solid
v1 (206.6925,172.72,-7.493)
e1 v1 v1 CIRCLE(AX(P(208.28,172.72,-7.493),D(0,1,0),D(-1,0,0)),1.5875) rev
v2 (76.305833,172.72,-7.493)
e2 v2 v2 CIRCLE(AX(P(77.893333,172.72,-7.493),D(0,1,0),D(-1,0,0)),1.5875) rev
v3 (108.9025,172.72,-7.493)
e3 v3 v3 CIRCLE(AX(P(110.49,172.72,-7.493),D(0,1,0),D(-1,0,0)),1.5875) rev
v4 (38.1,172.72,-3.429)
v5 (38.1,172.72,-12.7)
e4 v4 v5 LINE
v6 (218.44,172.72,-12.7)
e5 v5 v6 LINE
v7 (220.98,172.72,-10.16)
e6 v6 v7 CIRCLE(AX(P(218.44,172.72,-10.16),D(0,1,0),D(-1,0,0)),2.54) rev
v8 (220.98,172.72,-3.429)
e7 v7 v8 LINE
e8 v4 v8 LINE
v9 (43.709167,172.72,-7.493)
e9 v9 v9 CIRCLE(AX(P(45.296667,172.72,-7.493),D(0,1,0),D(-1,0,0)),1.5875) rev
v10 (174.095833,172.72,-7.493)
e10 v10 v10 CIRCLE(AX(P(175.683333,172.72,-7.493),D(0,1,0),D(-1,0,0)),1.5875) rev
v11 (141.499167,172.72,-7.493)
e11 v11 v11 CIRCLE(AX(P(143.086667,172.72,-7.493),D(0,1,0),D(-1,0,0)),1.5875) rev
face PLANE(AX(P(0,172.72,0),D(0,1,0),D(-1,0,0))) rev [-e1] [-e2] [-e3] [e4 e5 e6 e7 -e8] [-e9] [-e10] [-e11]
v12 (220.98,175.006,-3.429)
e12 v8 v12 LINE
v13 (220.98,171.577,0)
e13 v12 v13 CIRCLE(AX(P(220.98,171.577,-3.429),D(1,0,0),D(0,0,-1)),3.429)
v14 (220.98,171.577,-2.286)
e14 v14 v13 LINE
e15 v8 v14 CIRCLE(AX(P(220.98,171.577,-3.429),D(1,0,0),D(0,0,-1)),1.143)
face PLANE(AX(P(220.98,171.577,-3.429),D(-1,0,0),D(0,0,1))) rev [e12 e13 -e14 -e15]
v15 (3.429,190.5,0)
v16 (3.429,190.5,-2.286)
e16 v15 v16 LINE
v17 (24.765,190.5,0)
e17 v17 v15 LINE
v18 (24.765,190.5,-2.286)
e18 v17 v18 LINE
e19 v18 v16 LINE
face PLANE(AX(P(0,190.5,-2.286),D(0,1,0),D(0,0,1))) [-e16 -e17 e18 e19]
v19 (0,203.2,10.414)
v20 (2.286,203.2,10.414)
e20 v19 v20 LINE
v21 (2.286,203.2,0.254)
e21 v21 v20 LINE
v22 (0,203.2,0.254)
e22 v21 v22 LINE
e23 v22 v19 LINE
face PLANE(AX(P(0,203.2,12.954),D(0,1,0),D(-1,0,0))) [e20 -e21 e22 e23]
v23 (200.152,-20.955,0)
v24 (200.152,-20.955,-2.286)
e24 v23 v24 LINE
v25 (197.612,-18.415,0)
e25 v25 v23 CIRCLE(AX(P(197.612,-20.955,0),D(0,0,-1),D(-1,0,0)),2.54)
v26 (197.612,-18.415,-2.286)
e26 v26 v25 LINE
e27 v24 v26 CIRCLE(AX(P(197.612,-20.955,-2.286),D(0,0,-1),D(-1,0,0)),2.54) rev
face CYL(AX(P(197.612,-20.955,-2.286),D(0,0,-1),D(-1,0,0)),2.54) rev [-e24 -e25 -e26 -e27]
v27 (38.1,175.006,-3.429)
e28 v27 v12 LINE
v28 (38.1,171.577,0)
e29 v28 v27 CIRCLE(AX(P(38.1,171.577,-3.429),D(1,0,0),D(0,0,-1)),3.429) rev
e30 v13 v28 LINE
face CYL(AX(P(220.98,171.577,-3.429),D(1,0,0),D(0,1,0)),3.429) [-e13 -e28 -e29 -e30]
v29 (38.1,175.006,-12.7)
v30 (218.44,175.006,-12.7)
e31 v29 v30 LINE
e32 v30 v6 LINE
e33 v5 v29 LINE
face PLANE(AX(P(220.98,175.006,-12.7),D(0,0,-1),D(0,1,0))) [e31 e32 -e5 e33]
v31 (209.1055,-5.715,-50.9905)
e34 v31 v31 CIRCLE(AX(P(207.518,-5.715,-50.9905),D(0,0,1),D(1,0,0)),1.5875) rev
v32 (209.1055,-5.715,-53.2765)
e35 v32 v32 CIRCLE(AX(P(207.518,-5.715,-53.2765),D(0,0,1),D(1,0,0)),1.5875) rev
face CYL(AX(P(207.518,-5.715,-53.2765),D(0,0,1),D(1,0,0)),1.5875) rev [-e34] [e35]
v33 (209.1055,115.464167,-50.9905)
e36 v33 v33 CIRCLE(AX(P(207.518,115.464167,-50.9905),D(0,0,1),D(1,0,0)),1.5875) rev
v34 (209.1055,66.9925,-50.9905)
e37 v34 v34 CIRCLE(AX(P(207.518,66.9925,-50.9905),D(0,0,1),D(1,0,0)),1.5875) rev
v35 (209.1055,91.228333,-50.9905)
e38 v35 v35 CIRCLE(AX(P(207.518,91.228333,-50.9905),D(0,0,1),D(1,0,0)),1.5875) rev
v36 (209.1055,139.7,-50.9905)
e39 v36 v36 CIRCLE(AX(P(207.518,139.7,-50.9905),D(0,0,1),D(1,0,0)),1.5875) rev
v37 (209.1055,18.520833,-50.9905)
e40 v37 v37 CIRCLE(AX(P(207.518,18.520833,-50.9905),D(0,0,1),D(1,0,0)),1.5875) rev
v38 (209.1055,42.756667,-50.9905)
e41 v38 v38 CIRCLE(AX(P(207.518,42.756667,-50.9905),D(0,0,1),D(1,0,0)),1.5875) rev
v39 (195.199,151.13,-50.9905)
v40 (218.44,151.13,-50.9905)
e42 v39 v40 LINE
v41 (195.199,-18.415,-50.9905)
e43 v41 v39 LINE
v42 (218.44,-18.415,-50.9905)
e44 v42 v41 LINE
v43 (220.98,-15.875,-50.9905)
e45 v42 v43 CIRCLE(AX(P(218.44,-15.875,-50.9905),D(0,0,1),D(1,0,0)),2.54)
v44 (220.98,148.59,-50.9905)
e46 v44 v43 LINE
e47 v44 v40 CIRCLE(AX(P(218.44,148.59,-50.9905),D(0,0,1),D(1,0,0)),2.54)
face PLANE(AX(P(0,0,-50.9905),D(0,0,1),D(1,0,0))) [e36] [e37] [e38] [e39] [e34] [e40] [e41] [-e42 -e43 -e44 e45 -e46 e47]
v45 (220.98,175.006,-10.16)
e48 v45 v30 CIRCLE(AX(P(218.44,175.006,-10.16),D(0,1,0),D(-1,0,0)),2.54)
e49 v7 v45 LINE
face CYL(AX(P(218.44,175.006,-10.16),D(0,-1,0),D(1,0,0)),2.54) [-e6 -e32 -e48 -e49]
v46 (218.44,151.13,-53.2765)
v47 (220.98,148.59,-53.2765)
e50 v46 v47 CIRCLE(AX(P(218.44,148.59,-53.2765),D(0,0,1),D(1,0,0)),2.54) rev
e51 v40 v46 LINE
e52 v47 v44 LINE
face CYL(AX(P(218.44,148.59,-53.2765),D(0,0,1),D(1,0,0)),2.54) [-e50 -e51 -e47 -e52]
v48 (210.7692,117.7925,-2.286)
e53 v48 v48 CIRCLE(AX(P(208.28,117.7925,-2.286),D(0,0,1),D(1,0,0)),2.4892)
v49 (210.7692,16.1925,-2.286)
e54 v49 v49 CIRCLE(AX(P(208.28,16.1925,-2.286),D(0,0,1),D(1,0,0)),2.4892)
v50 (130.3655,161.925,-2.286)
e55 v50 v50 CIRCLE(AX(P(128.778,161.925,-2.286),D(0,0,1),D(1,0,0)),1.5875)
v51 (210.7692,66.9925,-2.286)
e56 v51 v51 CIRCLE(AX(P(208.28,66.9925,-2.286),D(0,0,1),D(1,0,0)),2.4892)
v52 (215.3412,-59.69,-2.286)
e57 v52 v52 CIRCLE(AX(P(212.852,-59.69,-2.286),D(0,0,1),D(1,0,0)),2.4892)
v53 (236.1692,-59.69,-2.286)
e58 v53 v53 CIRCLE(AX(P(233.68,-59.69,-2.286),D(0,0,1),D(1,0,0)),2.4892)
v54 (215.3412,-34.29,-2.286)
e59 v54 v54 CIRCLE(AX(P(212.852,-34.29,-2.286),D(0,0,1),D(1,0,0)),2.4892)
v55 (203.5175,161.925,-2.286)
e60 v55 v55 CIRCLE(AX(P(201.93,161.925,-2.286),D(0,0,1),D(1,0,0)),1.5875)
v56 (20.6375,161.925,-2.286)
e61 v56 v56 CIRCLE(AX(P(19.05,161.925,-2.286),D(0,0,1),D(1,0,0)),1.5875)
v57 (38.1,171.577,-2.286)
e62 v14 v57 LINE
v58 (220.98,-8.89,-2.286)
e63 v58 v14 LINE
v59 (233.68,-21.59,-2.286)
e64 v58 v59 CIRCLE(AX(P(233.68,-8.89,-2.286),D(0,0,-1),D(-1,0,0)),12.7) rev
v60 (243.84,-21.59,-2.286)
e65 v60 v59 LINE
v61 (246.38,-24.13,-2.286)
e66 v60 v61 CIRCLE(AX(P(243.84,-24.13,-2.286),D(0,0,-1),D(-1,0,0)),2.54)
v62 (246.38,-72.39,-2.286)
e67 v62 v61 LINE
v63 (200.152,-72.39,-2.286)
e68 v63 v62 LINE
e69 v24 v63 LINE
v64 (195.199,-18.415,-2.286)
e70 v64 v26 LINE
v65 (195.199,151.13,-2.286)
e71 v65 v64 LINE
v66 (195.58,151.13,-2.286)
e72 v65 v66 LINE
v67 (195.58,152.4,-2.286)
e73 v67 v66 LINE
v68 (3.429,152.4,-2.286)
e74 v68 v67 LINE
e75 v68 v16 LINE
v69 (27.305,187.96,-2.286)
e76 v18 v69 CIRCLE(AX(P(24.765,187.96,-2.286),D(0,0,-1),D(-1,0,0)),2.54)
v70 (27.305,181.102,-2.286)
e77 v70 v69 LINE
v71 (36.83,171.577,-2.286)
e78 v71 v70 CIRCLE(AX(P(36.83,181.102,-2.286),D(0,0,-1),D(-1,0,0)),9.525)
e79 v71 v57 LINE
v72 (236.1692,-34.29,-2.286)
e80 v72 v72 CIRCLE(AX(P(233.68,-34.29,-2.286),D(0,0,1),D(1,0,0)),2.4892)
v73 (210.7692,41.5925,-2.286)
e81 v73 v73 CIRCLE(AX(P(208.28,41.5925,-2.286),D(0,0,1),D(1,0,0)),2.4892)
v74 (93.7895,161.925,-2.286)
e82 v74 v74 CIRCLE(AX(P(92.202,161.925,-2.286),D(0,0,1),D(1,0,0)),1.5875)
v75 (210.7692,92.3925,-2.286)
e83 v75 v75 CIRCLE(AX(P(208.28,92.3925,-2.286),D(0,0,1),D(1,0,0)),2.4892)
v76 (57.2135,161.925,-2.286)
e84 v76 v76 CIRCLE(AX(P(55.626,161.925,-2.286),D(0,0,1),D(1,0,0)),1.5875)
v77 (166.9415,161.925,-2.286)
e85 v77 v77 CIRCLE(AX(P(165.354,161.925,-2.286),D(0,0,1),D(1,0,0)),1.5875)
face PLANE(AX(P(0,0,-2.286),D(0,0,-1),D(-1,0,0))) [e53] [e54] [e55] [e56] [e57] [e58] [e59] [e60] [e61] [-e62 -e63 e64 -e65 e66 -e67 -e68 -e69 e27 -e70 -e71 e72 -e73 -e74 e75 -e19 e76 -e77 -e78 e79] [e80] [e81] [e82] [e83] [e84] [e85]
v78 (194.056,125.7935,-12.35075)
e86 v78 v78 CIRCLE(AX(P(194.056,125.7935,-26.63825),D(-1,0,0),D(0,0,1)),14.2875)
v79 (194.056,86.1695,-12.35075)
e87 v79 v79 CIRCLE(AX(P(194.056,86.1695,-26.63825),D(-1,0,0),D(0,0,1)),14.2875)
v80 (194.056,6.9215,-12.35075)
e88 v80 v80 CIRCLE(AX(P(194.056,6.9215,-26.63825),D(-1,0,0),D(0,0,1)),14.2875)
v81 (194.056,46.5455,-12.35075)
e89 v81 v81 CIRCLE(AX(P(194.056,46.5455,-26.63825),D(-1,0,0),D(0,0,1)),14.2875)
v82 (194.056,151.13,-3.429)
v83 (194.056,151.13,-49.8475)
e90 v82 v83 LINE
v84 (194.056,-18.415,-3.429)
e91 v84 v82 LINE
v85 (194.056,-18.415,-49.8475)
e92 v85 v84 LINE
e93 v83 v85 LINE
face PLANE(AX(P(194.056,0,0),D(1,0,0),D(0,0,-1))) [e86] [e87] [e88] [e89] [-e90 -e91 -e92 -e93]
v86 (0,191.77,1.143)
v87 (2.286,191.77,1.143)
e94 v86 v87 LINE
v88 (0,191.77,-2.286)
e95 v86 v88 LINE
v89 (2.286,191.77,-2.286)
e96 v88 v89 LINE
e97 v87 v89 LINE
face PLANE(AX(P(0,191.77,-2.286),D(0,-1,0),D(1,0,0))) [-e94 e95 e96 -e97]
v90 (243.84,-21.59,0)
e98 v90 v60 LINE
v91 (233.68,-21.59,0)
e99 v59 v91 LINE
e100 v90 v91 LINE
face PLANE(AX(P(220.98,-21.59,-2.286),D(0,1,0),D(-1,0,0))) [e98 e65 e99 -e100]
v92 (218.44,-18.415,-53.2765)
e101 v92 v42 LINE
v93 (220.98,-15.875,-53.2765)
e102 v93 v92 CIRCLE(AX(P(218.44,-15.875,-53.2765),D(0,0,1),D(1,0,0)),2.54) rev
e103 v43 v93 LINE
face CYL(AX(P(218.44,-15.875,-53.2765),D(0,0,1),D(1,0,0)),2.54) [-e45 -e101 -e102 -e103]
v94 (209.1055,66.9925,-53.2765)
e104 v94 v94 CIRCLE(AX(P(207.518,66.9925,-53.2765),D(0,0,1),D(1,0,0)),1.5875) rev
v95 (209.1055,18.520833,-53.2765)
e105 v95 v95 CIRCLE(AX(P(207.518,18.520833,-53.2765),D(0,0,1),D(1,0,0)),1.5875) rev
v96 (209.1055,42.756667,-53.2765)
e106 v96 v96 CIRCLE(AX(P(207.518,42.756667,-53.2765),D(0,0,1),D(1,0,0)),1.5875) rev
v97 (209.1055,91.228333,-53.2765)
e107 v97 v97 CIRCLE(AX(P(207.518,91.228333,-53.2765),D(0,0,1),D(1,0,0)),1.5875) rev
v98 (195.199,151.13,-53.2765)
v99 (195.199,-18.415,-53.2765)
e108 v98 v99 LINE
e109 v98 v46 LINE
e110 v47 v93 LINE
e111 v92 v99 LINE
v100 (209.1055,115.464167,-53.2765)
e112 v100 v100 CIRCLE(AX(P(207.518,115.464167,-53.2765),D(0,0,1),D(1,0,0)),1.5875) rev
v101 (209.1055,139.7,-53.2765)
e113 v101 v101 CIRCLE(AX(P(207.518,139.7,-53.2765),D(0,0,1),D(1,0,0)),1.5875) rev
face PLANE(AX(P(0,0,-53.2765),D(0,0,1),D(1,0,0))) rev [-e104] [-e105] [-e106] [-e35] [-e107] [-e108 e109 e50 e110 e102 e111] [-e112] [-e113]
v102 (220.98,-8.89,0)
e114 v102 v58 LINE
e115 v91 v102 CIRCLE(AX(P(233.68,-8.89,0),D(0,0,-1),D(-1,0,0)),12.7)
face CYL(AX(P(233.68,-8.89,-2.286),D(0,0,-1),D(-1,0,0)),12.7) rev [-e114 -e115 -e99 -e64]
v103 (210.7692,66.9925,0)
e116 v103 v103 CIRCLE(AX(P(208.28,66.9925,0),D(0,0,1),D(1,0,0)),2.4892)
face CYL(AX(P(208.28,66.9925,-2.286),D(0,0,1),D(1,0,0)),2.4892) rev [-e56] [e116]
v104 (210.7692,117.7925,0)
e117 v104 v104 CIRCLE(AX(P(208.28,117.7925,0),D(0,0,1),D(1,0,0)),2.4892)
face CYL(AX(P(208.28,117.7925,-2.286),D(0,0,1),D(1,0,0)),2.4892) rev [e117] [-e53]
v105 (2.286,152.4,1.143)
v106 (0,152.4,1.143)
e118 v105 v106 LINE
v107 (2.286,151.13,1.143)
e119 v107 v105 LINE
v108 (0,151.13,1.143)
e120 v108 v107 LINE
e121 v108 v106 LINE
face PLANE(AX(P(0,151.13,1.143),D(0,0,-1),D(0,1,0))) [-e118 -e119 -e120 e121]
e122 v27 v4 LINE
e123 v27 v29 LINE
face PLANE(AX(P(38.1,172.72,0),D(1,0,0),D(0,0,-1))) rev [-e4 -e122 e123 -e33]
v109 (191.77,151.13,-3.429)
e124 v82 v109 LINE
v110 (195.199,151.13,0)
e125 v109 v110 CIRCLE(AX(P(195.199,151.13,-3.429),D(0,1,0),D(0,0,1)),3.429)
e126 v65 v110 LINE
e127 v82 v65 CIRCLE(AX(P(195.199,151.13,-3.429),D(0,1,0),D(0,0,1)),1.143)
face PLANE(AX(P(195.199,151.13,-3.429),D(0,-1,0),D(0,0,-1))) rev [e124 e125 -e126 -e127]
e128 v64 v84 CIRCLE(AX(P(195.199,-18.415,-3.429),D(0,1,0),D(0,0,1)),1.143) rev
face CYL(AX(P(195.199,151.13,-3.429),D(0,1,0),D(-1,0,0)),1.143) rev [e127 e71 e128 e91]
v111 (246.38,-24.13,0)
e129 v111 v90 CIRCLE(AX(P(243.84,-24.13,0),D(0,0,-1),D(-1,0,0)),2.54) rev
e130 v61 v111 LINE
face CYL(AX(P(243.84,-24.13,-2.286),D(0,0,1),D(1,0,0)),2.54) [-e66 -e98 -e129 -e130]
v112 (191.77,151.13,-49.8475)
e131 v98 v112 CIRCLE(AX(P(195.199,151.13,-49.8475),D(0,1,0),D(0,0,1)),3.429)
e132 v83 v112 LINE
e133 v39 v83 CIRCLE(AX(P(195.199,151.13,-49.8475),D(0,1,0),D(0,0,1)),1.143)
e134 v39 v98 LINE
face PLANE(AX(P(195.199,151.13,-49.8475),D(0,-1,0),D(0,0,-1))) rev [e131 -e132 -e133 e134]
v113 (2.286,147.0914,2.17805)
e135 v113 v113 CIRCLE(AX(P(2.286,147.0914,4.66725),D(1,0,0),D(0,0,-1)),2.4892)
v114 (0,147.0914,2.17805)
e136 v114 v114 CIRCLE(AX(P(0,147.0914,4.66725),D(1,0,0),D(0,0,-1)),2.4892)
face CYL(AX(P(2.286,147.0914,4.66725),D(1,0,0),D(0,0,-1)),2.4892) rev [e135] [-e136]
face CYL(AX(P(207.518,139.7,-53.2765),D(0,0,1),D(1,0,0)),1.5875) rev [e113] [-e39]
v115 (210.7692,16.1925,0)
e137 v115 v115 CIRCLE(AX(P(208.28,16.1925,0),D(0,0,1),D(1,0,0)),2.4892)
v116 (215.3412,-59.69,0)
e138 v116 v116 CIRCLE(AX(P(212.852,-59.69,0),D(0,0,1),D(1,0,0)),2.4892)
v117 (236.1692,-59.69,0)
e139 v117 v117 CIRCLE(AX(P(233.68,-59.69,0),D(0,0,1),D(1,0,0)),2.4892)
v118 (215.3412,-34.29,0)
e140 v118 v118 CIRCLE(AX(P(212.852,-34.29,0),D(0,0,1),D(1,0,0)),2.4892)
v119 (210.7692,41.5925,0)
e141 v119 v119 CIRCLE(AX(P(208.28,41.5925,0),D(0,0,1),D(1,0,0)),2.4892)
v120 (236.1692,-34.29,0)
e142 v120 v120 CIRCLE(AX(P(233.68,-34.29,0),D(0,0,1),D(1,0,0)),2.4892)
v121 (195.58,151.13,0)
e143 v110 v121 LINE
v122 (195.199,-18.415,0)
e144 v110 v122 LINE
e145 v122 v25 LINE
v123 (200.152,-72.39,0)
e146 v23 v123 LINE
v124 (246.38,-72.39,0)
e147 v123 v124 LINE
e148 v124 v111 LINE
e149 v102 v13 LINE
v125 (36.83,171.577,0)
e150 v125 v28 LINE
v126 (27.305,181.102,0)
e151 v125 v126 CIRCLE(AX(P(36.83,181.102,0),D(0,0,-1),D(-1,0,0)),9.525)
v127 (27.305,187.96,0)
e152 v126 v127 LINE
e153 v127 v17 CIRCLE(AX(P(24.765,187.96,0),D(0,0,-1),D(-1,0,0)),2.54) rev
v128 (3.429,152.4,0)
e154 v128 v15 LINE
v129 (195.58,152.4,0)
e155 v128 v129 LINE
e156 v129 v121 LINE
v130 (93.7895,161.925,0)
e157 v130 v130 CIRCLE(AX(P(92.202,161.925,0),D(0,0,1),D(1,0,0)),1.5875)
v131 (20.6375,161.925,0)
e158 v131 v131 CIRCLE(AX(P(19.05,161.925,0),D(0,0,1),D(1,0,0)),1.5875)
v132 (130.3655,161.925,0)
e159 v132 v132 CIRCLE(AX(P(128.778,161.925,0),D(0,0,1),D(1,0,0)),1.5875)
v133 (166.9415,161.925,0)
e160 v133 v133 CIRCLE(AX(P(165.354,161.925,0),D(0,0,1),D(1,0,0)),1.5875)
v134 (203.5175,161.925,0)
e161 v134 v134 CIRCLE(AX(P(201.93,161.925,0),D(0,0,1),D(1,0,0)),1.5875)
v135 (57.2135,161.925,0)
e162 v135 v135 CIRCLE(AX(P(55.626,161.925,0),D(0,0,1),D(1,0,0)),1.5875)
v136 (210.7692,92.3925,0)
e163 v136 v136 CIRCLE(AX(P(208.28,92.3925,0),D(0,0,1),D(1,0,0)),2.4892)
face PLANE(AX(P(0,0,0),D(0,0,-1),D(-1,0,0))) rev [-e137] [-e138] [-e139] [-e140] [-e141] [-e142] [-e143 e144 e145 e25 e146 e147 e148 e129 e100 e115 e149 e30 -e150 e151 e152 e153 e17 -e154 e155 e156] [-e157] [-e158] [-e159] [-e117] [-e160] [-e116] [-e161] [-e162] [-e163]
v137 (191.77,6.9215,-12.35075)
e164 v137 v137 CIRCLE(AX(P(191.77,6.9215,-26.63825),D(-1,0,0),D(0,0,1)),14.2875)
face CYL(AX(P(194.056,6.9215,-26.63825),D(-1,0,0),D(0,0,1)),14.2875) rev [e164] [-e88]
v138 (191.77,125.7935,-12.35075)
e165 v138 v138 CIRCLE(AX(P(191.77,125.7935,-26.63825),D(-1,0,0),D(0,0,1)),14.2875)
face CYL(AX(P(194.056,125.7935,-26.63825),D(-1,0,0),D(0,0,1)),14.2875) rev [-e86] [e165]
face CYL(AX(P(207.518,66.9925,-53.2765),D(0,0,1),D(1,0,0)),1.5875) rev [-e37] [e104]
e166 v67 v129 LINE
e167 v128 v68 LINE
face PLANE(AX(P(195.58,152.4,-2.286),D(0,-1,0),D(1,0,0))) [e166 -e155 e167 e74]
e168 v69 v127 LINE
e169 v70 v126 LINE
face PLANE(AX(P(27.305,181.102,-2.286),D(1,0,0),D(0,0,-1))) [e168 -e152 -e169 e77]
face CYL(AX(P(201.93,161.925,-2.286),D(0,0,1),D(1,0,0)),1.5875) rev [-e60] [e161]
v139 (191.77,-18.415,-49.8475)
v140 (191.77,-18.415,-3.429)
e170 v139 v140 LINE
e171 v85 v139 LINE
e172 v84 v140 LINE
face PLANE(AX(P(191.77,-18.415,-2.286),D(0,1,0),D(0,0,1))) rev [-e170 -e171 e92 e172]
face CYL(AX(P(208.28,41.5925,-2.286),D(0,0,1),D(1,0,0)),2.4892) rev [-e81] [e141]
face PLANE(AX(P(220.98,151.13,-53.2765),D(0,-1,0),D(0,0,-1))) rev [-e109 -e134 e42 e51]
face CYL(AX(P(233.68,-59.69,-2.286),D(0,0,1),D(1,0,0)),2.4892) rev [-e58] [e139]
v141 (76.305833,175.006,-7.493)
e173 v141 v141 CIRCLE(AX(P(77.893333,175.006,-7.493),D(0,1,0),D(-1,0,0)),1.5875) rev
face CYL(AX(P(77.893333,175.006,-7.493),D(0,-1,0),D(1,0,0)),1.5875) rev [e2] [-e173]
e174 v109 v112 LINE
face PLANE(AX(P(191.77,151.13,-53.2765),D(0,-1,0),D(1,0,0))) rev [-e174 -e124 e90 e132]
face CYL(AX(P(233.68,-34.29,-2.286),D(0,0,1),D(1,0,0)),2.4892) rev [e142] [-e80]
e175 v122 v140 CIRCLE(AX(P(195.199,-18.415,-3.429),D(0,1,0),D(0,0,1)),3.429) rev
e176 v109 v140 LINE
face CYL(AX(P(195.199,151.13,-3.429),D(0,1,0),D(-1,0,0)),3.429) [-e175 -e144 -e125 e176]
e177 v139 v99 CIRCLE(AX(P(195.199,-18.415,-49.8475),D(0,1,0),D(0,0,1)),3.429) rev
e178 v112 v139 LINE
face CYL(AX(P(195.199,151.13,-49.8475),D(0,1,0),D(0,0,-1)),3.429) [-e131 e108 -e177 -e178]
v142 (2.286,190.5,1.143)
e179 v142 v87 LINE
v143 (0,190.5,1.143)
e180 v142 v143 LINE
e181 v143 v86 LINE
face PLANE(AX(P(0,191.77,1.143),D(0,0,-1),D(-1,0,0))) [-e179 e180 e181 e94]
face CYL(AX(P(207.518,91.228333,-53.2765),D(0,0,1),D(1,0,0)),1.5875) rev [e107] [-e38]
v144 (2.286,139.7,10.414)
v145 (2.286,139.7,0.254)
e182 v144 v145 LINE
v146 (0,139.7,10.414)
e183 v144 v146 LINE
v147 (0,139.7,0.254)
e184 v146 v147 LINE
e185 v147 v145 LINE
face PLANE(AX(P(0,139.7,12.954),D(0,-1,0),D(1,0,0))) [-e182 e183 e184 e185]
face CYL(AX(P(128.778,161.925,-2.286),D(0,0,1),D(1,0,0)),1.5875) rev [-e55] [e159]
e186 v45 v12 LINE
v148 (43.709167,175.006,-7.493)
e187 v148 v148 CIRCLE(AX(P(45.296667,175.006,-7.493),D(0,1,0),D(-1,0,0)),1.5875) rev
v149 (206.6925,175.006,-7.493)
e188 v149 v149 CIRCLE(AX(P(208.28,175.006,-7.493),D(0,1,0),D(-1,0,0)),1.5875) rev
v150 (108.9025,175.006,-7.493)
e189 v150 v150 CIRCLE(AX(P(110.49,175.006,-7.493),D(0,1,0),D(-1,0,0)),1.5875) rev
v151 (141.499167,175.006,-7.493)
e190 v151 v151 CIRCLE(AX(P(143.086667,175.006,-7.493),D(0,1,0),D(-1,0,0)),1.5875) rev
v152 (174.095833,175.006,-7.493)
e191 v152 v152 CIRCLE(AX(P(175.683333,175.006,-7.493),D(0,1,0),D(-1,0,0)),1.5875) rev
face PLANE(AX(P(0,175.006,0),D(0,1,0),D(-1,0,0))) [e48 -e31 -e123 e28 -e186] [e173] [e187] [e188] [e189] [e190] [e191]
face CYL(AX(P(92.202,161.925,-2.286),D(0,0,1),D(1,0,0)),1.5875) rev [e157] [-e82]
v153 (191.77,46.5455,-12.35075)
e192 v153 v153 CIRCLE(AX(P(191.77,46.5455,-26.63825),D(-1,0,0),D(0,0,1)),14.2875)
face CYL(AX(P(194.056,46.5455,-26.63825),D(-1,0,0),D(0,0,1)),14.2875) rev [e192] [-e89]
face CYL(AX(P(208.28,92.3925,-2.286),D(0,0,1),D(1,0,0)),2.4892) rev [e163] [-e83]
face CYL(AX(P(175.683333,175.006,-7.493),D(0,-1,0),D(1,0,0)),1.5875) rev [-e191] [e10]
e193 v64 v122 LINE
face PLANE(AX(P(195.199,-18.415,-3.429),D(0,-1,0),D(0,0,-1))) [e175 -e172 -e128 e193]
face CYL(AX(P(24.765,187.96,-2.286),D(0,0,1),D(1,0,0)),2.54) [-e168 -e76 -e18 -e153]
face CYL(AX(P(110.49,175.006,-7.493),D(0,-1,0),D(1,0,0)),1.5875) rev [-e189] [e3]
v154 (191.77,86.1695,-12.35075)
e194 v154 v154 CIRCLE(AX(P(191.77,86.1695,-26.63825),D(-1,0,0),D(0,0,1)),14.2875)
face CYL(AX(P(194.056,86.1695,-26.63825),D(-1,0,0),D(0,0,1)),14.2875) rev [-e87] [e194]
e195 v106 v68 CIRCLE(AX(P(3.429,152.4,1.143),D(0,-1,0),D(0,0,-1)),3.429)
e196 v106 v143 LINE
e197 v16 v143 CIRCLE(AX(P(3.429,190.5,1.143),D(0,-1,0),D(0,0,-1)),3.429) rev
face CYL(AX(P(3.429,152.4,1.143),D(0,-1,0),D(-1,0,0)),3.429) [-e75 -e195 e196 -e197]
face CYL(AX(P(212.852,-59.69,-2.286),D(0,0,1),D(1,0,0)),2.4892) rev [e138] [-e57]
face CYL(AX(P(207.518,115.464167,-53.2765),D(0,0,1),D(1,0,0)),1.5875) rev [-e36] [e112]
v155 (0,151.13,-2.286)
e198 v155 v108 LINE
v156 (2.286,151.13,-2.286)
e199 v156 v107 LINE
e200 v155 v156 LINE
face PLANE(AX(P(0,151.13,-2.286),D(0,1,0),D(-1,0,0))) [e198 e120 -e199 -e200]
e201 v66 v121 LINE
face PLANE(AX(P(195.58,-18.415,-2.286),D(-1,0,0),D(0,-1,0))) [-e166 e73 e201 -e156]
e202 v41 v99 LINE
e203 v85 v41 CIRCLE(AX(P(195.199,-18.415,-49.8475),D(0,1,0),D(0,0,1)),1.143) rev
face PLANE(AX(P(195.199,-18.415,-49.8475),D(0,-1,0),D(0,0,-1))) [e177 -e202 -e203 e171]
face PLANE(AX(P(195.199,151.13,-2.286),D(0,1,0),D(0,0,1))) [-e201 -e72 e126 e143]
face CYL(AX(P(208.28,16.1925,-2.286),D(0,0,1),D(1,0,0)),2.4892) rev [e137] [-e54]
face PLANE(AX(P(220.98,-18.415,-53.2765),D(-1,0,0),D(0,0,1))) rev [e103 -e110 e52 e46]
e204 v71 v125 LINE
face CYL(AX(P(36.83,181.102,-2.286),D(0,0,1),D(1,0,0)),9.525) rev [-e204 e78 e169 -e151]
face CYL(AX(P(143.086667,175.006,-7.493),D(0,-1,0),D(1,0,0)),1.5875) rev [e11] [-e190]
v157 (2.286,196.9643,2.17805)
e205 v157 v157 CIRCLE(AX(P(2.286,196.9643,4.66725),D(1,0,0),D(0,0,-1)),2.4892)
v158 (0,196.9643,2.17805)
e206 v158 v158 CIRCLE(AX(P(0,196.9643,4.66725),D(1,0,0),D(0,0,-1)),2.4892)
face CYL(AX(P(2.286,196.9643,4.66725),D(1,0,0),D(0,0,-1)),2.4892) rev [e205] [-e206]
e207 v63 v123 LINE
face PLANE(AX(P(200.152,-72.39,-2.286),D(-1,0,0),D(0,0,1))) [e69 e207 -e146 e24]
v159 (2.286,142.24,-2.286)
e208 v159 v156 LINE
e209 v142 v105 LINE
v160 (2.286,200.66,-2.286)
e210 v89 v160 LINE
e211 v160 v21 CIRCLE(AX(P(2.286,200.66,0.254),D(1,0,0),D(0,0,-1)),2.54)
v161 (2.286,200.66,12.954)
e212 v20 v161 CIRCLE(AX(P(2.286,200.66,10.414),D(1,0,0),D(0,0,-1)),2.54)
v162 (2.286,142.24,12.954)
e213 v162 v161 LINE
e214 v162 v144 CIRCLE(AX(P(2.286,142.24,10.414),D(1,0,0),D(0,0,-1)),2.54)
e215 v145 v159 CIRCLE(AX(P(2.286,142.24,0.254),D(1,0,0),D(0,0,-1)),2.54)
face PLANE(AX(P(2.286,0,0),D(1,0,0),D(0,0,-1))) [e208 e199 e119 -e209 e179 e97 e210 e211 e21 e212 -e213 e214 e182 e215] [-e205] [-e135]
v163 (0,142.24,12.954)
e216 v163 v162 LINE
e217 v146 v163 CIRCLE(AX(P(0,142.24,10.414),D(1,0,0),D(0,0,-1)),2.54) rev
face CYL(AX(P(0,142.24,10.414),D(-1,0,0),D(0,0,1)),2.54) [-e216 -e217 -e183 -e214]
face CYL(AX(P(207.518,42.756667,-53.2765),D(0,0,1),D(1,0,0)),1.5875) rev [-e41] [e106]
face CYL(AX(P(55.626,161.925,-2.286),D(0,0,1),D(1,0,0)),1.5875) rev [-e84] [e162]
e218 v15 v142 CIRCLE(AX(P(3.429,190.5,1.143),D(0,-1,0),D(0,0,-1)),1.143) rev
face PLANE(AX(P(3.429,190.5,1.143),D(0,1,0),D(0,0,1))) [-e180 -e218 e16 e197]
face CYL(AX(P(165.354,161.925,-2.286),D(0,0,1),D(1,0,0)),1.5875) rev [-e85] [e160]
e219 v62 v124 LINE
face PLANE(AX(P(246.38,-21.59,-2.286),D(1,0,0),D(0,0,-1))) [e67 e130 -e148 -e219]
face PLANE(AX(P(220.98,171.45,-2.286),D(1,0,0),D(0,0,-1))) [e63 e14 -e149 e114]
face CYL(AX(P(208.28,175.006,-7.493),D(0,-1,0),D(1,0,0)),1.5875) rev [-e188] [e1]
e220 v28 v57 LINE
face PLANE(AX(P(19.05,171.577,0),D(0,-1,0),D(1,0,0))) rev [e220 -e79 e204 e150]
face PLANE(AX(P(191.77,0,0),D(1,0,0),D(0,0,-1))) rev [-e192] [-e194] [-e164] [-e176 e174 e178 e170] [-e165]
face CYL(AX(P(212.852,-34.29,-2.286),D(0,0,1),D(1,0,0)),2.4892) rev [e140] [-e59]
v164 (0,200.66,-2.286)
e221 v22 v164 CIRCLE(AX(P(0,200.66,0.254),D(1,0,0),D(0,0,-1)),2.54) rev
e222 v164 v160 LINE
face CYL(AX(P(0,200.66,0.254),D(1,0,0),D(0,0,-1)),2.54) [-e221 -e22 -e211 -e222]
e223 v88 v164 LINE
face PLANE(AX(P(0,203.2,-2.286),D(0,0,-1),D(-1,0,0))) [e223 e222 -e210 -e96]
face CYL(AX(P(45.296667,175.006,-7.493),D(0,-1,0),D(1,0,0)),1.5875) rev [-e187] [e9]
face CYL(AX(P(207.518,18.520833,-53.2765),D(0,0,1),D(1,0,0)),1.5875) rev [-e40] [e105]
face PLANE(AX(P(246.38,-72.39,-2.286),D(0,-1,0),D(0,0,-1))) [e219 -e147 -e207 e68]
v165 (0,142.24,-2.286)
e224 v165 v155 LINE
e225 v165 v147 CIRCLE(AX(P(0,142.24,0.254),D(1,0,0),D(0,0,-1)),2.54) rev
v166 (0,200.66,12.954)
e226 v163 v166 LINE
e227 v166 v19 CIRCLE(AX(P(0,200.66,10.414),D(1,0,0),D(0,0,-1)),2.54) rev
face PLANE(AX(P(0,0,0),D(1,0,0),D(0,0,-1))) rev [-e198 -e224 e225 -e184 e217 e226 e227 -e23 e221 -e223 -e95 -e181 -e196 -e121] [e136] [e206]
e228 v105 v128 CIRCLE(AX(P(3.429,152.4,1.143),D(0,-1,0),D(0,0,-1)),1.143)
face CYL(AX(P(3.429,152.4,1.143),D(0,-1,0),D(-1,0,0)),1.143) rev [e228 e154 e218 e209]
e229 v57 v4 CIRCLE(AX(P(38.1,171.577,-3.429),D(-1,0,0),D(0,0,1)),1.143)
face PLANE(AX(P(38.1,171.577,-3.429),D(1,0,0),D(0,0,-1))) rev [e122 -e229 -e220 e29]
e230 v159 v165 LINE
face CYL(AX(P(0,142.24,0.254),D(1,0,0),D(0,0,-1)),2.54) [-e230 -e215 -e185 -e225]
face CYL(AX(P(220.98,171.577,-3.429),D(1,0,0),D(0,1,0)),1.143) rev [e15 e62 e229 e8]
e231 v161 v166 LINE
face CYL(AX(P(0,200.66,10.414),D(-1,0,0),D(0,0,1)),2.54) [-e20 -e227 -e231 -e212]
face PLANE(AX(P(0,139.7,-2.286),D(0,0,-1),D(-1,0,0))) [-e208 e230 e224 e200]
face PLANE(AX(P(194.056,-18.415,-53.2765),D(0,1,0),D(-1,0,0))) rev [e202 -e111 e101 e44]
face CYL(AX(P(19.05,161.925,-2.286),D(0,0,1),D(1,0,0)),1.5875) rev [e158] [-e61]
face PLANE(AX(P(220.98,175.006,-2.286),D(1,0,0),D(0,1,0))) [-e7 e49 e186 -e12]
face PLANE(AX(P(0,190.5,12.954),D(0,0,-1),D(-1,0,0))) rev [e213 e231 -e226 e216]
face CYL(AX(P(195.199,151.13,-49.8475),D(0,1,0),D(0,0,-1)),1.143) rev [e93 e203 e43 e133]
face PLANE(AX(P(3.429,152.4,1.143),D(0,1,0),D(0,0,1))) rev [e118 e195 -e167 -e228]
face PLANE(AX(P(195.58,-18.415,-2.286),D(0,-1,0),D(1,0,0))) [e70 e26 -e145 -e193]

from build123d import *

# Parameters (mm, degrees)
SKETCH1_R                    = 2.4892
SKETCH1_R_2                  = 1.5875
BASE_FLANGE1_DEPTH           = 2.286
EDGE_FLANGE2_DEPTH           = 169.545
EDGE_FLANGE3_STRIP_W         = 21.43
EDGE_FLANGE3_STRIP_H         = 2.286
EDGE_FLANGE3_STRIP_CUT_DEPTH = 169.545
EDGE_FLANGE3_DEPTH           = 169.545
EDGE_FLANGE3_PROFILE_W       = 169.545
EDGE_FLANGE3_PROFILE_H       = 25.781
EDGE_FLANGE3_PROFILE_R       = 1.5875
EDGE_FLANGE3_FLAT_DEPTH      = 2.286
EDGE_FLANGE6_DEPTH           = 151.257
EDGE_FLANGE7_STRIP_W         = 21.43
EDGE_FLANGE7_STRIP_H         = 2.286
EDGE_FLANGE7_STRIP_CUT_DEPTH = 151.257
EDGE_FLANGE7_DEPTH           = 151.257
EDGE_FLANGE7_PROFILE_W       = 151.257
EDGE_FLANGE7_PROFILE_H       = 13.23975
EDGE_FLANGE7_PROFILE_R       = 1.63195
EDGE_FLANGE7_FLAT_DEPTH      = 2.286
EDGE_FLANGE8_DEPTH           = 220.98
EDGE_FLANGE8_START           = -2.286
EDGE_FLANGE8_PROFILE_W       = 220.98
EDGE_FLANGE8_PROFILE_H       = 9.271
EDGE_FLANGE8_PROFILE_R       = 1.5875
EDGE_FLANGE8_FLAT_DEPTH      = 2.286
FILLET1_R                    = 2.54
FILLET2_R                    = 12.7
SKETCH35_W                   = 16.66875
SKETCH35_H                   = 152.4
SKETCH35_W_2                 = 38.1
SKETCH35_H_2                 = 3.429
CUT_EXTRUDE1_DEPTH           = 307.869010961
BOSS_EXTRUDE1_START          = -2.286
BOSS_EXTRUDE1_DEPTH          = 2.286
EDGE_FLANGE9_STRIP_W         = 21.43
EDGE_FLANGE9_STRIP_H         = 2.286
EDGE_FLANGE9_STRIP_CUT_DEPTH = 38.1
EDGE_FLANGE9_DEPTH           = 38.1
BOSS_EXTRUDE2_DEPTH          = 2.286
F_10_CLEARANCE_HOLE1_D       = 4.9784
FILLET3_R                    = 2.54
SKETCH43_R                   = 14.2875
CUT_EXTRUDE2_DEPTH           = 2.54


# Sheet-metal steps are written as plain solids
with BuildPart() as part:
    # Sketch1 → Base-Flange1 (new body)
    with BuildSketch(Plane.XY):
        Polygon((0, 0), (0, 171.45), (220.98, 171.45), (220.98, -21.59), (246.38, -21.59), (246.38, -72.39), (200.152, -72.39), (200.152, -18.415), (195.58, -18.415), (195.58, 152.4), (7.62, 152.4), (7.62, 0), align=None)
        with Locations((233.68, -59.69)):
            Circle(SKETCH1_R, mode=Mode.SUBTRACT)
        with Locations((212.852, -59.69)):
            Circle(SKETCH1_R, mode=Mode.SUBTRACT)
        with Locations((212.852, -34.29)):
            Circle(SKETCH1_R, mode=Mode.SUBTRACT)
        with Locations((233.68, -34.29)):
            Circle(SKETCH1_R, mode=Mode.SUBTRACT)
        with Locations((208.28, 117.7925)):
            Circle(SKETCH1_R, mode=Mode.SUBTRACT)
        with Locations((208.28, 92.3925)):
            Circle(SKETCH1_R, mode=Mode.SUBTRACT)
        with Locations((208.28, 66.9925)):
            Circle(SKETCH1_R, mode=Mode.SUBTRACT)
        with Locations((208.28, 41.5925)):
            Circle(SKETCH1_R, mode=Mode.SUBTRACT)
        with Locations((208.28, 16.1925)):
            Circle(SKETCH1_R, mode=Mode.SUBTRACT)
        with Locations((19.05, 161.925)):
            Circle(SKETCH1_R_2, mode=Mode.SUBTRACT)
        with Locations((55.626, 161.925)):
            Circle(SKETCH1_R_2, mode=Mode.SUBTRACT)
        with Locations((92.202, 161.925)):
            Circle(SKETCH1_R_2, mode=Mode.SUBTRACT)
        with Locations((128.778, 161.925)):
            Circle(SKETCH1_R_2, mode=Mode.SUBTRACT)
        with Locations((165.354, 161.925)):
            Circle(SKETCH1_R_2, mode=Mode.SUBTRACT)
        with Locations((201.93, 161.925)):
            Circle(SKETCH1_R_2, mode=Mode.SUBTRACT)
    extrude(amount=-BASE_FLANGE1_DEPTH)

    # Edge-Flange2 section (across the edge) → Edge-Flange2 (add)
    with BuildSketch(Plane(origin=(194.056, -18.415, -2.286), x_dir=(1, 0, 0), z_dir=(0, 1, 0))):
        with BuildLine():
            Line((-2.286, 1.143), (-2.286, 50.9905))
            Line((-2.286, 50.9905), (0, 50.9905))
            Line((0, 50.9905), (0, 1.143))
            ThreePointArc((0, 1.143), (0.334776949, 0.334776949), (1.143, 0))
            Line((1.143, 0), (1.524, 0))
            Line((1.524, 0), (1.524, -2.286))
            Line((1.524, -2.286), (1.143, -2.286))
            ThreePointArc((1.143, -2.286), (-1.281669153, -1.281669153), (-2.286, 1.143))
        make_face()
    extrude(amount=EDGE_FLANGE2_DEPTH)

    # Edge-Flange3 strip (across the edge) → Edge-Flange3 strip cut (cut)
    with BuildSketch(Plane(origin=(194.056, -18.415, -53.2765), x_dir=(0, 0, 1), z_dir=(0, 1, 0))):
        with Locations((-7.286, -1.143)):
            Rectangle(EDGE_FLANGE3_STRIP_W, EDGE_FLANGE3_STRIP_H)
    extrude(amount=EDGE_FLANGE3_STRIP_CUT_DEPTH, mode=Mode.SUBTRACT)

    # Edge-Flange3 bend section (across the edge) → Edge-Flange3 (add)
    with BuildSketch(Plane(origin=(194.056, -18.415, -53.2765), x_dir=(0, 0, 1), z_dir=(0, 1, 0))):
        with BuildLine():
            Line((0, 1.143), (2.286, 1.143))
            ThreePointArc((2.286, 1.143), (2.620776949, 0.334776949), (3.429, 0))
            Line((3.429, 0), (3.429, -2.286))
            ThreePointArc((3.429, -2.286), (1.004330847, -1.281669153), (0, 1.143))
        make_face()
    extrude(amount=EDGE_FLANGE3_DEPTH)

    # Edge-Flange3 profile (on flange) → Edge-Flange3 flat (add)
    with BuildSketch(Plane(origin=(194.056, 0, -53.2765), x_dir=(0, 1, 0), z_dir=(0, 0, -1))):
        with Locations((66.3575, 14.0335)):
            Rectangle(EDGE_FLANGE3_PROFILE_W, EDGE_FLANGE3_PROFILE_H)
        with Locations((139.7, 13.462)):
            Circle(EDGE_FLANGE3_PROFILE_R, mode=Mode.SUBTRACT)
        with Locations((115.464166667, 13.462)):
            Circle(EDGE_FLANGE3_PROFILE_R, mode=Mode.SUBTRACT)
        with Locations((91.228333333, 13.462)):
            Circle(EDGE_FLANGE3_PROFILE_R, mode=Mode.SUBTRACT)
        with Locations((66.9925, 13.462)):
            Circle(EDGE_FLANGE3_PROFILE_R, mode=Mode.SUBTRACT)
        with Locations((42.756666667, 13.462)):
            Circle(EDGE_FLANGE3_PROFILE_R, mode=Mode.SUBTRACT)
        with Locations((18.520833333, 13.462)):
            Circle(EDGE_FLANGE3_PROFILE_R, mode=Mode.SUBTRACT)
        with Locations((-5.715, 13.462)):
            Circle(EDGE_FLANGE3_PROFILE_R, mode=Mode.SUBTRACT)
    extrude(amount=-EDGE_FLANGE3_FLAT_DEPTH)

    # Edge-Flange6 section (across the edge) → Edge-Flange6 (add)
    with BuildSketch(Plane(origin=(9.144, 151.257, -2.286), x_dir=(-1, 0, 0), z_dir=(0, -1, 0))):
        with BuildLine():
            Line((-2.286, 1.143), (-2.286, 48.514))
            Line((-2.286, 48.514), (0, 48.514))
            Line((0, 48.514), (0, 1.143))
            ThreePointArc((0, 1.143), (0.334776949, 0.334776949), (1.143, 0))
            Line((1.143, 0), (1.524, 0))
            Line((1.524, 0), (1.524, -2.286))
            Line((1.524, -2.286), (1.143, -2.286))
            ThreePointArc((1.143, -2.286), (-1.281669153, -1.281669153), (-2.286, 1.143))
        make_face()
    extrude(amount=EDGE_FLANGE6_DEPTH)

    # Edge-Flange7 strip (across the edge) → Edge-Flange7 strip cut (cut)
    with BuildSketch(Plane(origin=(9.144, 151.257, -50.8), x_dir=(0, 0, 1), z_dir=(0, -1, 0))):
        with Locations((-7.286, -1.143)):
            Rectangle(EDGE_FLANGE7_STRIP_W, EDGE_FLANGE7_STRIP_H)
    extrude(amount=EDGE_FLANGE7_STRIP_CUT_DEPTH, mode=Mode.SUBTRACT)

    # Edge-Flange7 bend section (across the edge) → Edge-Flange7 (add)
    with BuildSketch(Plane(origin=(9.144, 151.257, -50.8), x_dir=(0, 0, 1), z_dir=(0, -1, 0))):
        with BuildLine():
            Line((0, 1.143), (2.286, 1.143))
            ThreePointArc((2.286, 1.143), (2.620776949, 0.334776949), (3.429, 0))
            Line((3.429, 0), (3.429, -2.286))
            ThreePointArc((3.429, -2.286), (1.004330847, -1.281669153), (0, 1.143))
        make_face()
    extrude(amount=EDGE_FLANGE7_DEPTH)

    # Edge-Flange7 profile (on flange) → Edge-Flange7 flat (add)
    with BuildSketch(Plane(origin=(9.144, 0, -50.8), x_dir=(0, 1, 0), z_dir=(0, 0, 1))):
        with Locations((75.6285, 7.762875)):
            Rectangle(EDGE_FLANGE7_PROFILE_W, EDGE_FLANGE7_PROFILE_H)
        with Locations((126.746, 7.14375)):
            Circle(EDGE_FLANGE7_PROFILE_R, mode=Mode.SUBTRACT)
        with Locations((83.08975, 7.14375)):
            Circle(EDGE_FLANGE7_PROFILE_R, mode=Mode.SUBTRACT)
        with Locations((39.4335, 7.14375)):
            Circle(EDGE_FLANGE7_PROFILE_R, mode=Mode.SUBTRACT)
    extrude(amount=EDGE_FLANGE7_FLAT_DEPTH)

    # Edge-Flange8 bend section (across the edge) → Edge-Flange8 (add)
    with BuildSketch(Plane(origin=(0, 172.72, -2.286), x_dir=(0, -1, 0), z_dir=(1, 0, 0))):
        with BuildLine():
            Line((-2.286, 1.143), (0, 1.143))
            ThreePointArc((0, 1.143), (0.334776949, 0.334776949), (1.143, 0))
            Line((1.143, 0), (1.27, 0))
            Line((1.27, 0), (1.27, -2.286))
            Line((1.27, -2.286), (1.143, -2.286))
            ThreePointArc((1.143, -2.286), (-1.281669153, -1.281669153), (-2.286, 1.143))
        make_face()
    extrude(amount=EDGE_FLANGE8_DEPTH)

    # Edge-Flange8 profile (on flange) → Edge-Flange8 flat (add)
    with BuildSketch(Plane(origin=(0, 172.72, -2.286), x_dir=(-1, 0, 0), z_dir=(0, -1, 0)).offset(EDGE_FLANGE8_START)):
        with Locations((-110.49, 5.7785)):
            Rectangle(EDGE_FLANGE8_PROFILE_W, EDGE_FLANGE8_PROFILE_H)
        with Locations((-12.7, 5.207)):
            Circle(EDGE_FLANGE8_PROFILE_R, mode=Mode.SUBTRACT)
        with Locations((-45.296666667, 5.207)):
            Circle(EDGE_FLANGE8_PROFILE_R, mode=Mode.SUBTRACT)
        with Locations((-77.893333333, 5.207)):
            Circle(EDGE_FLANGE8_PROFILE_R, mode=Mode.SUBTRACT)
        with Locations((-110.49, 5.207)):
            Circle(EDGE_FLANGE8_PROFILE_R, mode=Mode.SUBTRACT)
        with Locations((-143.086666667, 5.207)):
            Circle(EDGE_FLANGE8_PROFILE_R, mode=Mode.SUBTRACT)
        with Locations((-175.683333333, 5.207)):
            Circle(EDGE_FLANGE8_PROFILE_R, mode=Mode.SUBTRACT)
        with Locations((-208.28, 5.207)):
            Circle(EDGE_FLANGE8_PROFILE_R, mode=Mode.SUBTRACT)
    extrude(amount=EDGE_FLANGE8_FLAT_DEPTH)

    # Fillet1
    fillet1_edges = [part.edges().sort_by_distance(p)[0] for p in [
        (220.98, -18.415, -52.1335),
        (220.98, 151.13, -52.1335),
        (246.38, -21.59, -1.143),
        (200.152, -18.415, -1.143),
        (0, 173.863, -12.7),
        (220.98, 173.863, -12.7),
    ]]
    fillet(fillet1_edges, radius=FILLET1_R)

    # Fillet2
    fillet2_edges = [part.edges().sort_by_distance(p)[0] for p in [
        (220.98, -21.59, -1.143),
    ]]
    fillet(fillet2_edges, radius=FILLET2_R)

    # Sketch35 → Cut-Extrude1 (cut, through all)
    with BuildSketch(Plane.XY):
        with Locations((3.095625, 76.2)):
            Rectangle(SKETCH35_W, SKETCH35_H)
        with Locations((19.05, 173.2915)):
            Rectangle(SKETCH35_W_2, SKETCH35_H_2)
    extrude(amount=-CUT_EXTRUDE1_DEPTH, mode=Mode.SUBTRACT)

    # Sketch36 → Boss-Extrude1 (add)
    with BuildSketch(Plane.XY.offset(BOSS_EXTRUDE1_START)):
        with BuildLine():
            Line((36.83, 171.577), (0, 171.577))
            Line((0, 171.577), (0, 190.5))
            Line((0, 190.5), (27.305, 190.5))
            Line((27.305, 190.5), (27.305, 181.102))
            ThreePointArc((27.305, 181.102), (30.094807909, 174.366807909), (36.83, 171.577))
        make_face()
    extrude(amount=BOSS_EXTRUDE1_DEPTH)

    # Edge-Flange9 strip (across the edge) → Edge-Flange9 strip cut (cut)
    with BuildSketch(Plane.XZ.offset(-190.5)):
        with Locations((-7.286, -1.143)):
            Rectangle(EDGE_FLANGE9_STRIP_W, EDGE_FLANGE9_STRIP_H)
    extrude(amount=EDGE_FLANGE9_STRIP_CUT_DEPTH, mode=Mode.SUBTRACT)

    # Edge-Flange9 section (across the edge) → Edge-Flange9 (add)
    with BuildSketch(Plane.XZ.offset(-190.5)):
        with BuildLine():
            Line((0, 1.143), (0, 12.954))
            Line((0, 12.954), (2.286, 12.954))
            Line((2.286, 12.954), (2.286, 1.143))
            ThreePointArc((2.286, 1.143), (2.620776949, 0.334776949), (3.429, 0))
            Line((3.429, 0), (3.429, -2.286))
            ThreePointArc((3.429, -2.286), (1.004330847, -1.281669153), (0, 1.143))
        make_face()
    extrude(amount=EDGE_FLANGE9_DEPTH)

    # Sketch40 → Boss-Extrude2 (add)
    with BuildSketch(Plane(origin=(2.286, 0, 0), x_dir=(0, 0, -1), z_dir=(1, 0, 0))):
        Polygon((-12.954, 190.5), (-12.954, 203.2), (2.286, 203.2), (2.286, 191.77), (-1.143, 191.77), (-1.143, 190.5), align=None)
        Polygon((-12.954, 152.4), (-12.954, 139.7), (2.286, 139.7), (2.286, 151.13), (-1.143, 151.13), (-1.143, 152.4), align=None)
    extrude(amount=-BOSS_EXTRUDE2_DEPTH)

    # #10 Clearance Hole1 (through all)
    with Locations(Plane(origin=(2.286, 0, 0), x_dir=(0, 0, -1), z_dir=(1, 0, 0))):
        with Locations((-4.66725, 196.9643), (-4.66725, 147.0914)):
            Hole(F_10_CLEARANCE_HOLE1_D / 2)

    # Fillet3
    fillet3_edges = [part.edges().sort_by_distance(p)[0] for p in [
        (27.305, 190.5, -1.143),
        (1.143, 203.2, 12.954),
        (1.143, 203.2, -2.286),
        (1.143, 139.7, -2.286),
        (1.143, 139.7, 12.954),
    ]]
    fillet(fillet3_edges, radius=FILLET3_R)

    # Sketch43 → Cut-Extrude2 (cut)
    with BuildSketch(Plane.ZY.offset(-191.77)):
        with Locations((-26.63825, 6.9215)):
            Circle(SKETCH43_R)
        with Locations((-26.63825, 46.5455)):
            Circle(SKETCH43_R)
        with Locations((-26.63825, 86.1695)):
            Circle(SKETCH43_R)
        with Locations((-26.63825, 125.7935)):
            Circle(SKETCH43_R)
    extrude(amount=-CUT_EXTRUDE2_DEPTH, mode=Mode.SUBTRACT)


solid = part.part
